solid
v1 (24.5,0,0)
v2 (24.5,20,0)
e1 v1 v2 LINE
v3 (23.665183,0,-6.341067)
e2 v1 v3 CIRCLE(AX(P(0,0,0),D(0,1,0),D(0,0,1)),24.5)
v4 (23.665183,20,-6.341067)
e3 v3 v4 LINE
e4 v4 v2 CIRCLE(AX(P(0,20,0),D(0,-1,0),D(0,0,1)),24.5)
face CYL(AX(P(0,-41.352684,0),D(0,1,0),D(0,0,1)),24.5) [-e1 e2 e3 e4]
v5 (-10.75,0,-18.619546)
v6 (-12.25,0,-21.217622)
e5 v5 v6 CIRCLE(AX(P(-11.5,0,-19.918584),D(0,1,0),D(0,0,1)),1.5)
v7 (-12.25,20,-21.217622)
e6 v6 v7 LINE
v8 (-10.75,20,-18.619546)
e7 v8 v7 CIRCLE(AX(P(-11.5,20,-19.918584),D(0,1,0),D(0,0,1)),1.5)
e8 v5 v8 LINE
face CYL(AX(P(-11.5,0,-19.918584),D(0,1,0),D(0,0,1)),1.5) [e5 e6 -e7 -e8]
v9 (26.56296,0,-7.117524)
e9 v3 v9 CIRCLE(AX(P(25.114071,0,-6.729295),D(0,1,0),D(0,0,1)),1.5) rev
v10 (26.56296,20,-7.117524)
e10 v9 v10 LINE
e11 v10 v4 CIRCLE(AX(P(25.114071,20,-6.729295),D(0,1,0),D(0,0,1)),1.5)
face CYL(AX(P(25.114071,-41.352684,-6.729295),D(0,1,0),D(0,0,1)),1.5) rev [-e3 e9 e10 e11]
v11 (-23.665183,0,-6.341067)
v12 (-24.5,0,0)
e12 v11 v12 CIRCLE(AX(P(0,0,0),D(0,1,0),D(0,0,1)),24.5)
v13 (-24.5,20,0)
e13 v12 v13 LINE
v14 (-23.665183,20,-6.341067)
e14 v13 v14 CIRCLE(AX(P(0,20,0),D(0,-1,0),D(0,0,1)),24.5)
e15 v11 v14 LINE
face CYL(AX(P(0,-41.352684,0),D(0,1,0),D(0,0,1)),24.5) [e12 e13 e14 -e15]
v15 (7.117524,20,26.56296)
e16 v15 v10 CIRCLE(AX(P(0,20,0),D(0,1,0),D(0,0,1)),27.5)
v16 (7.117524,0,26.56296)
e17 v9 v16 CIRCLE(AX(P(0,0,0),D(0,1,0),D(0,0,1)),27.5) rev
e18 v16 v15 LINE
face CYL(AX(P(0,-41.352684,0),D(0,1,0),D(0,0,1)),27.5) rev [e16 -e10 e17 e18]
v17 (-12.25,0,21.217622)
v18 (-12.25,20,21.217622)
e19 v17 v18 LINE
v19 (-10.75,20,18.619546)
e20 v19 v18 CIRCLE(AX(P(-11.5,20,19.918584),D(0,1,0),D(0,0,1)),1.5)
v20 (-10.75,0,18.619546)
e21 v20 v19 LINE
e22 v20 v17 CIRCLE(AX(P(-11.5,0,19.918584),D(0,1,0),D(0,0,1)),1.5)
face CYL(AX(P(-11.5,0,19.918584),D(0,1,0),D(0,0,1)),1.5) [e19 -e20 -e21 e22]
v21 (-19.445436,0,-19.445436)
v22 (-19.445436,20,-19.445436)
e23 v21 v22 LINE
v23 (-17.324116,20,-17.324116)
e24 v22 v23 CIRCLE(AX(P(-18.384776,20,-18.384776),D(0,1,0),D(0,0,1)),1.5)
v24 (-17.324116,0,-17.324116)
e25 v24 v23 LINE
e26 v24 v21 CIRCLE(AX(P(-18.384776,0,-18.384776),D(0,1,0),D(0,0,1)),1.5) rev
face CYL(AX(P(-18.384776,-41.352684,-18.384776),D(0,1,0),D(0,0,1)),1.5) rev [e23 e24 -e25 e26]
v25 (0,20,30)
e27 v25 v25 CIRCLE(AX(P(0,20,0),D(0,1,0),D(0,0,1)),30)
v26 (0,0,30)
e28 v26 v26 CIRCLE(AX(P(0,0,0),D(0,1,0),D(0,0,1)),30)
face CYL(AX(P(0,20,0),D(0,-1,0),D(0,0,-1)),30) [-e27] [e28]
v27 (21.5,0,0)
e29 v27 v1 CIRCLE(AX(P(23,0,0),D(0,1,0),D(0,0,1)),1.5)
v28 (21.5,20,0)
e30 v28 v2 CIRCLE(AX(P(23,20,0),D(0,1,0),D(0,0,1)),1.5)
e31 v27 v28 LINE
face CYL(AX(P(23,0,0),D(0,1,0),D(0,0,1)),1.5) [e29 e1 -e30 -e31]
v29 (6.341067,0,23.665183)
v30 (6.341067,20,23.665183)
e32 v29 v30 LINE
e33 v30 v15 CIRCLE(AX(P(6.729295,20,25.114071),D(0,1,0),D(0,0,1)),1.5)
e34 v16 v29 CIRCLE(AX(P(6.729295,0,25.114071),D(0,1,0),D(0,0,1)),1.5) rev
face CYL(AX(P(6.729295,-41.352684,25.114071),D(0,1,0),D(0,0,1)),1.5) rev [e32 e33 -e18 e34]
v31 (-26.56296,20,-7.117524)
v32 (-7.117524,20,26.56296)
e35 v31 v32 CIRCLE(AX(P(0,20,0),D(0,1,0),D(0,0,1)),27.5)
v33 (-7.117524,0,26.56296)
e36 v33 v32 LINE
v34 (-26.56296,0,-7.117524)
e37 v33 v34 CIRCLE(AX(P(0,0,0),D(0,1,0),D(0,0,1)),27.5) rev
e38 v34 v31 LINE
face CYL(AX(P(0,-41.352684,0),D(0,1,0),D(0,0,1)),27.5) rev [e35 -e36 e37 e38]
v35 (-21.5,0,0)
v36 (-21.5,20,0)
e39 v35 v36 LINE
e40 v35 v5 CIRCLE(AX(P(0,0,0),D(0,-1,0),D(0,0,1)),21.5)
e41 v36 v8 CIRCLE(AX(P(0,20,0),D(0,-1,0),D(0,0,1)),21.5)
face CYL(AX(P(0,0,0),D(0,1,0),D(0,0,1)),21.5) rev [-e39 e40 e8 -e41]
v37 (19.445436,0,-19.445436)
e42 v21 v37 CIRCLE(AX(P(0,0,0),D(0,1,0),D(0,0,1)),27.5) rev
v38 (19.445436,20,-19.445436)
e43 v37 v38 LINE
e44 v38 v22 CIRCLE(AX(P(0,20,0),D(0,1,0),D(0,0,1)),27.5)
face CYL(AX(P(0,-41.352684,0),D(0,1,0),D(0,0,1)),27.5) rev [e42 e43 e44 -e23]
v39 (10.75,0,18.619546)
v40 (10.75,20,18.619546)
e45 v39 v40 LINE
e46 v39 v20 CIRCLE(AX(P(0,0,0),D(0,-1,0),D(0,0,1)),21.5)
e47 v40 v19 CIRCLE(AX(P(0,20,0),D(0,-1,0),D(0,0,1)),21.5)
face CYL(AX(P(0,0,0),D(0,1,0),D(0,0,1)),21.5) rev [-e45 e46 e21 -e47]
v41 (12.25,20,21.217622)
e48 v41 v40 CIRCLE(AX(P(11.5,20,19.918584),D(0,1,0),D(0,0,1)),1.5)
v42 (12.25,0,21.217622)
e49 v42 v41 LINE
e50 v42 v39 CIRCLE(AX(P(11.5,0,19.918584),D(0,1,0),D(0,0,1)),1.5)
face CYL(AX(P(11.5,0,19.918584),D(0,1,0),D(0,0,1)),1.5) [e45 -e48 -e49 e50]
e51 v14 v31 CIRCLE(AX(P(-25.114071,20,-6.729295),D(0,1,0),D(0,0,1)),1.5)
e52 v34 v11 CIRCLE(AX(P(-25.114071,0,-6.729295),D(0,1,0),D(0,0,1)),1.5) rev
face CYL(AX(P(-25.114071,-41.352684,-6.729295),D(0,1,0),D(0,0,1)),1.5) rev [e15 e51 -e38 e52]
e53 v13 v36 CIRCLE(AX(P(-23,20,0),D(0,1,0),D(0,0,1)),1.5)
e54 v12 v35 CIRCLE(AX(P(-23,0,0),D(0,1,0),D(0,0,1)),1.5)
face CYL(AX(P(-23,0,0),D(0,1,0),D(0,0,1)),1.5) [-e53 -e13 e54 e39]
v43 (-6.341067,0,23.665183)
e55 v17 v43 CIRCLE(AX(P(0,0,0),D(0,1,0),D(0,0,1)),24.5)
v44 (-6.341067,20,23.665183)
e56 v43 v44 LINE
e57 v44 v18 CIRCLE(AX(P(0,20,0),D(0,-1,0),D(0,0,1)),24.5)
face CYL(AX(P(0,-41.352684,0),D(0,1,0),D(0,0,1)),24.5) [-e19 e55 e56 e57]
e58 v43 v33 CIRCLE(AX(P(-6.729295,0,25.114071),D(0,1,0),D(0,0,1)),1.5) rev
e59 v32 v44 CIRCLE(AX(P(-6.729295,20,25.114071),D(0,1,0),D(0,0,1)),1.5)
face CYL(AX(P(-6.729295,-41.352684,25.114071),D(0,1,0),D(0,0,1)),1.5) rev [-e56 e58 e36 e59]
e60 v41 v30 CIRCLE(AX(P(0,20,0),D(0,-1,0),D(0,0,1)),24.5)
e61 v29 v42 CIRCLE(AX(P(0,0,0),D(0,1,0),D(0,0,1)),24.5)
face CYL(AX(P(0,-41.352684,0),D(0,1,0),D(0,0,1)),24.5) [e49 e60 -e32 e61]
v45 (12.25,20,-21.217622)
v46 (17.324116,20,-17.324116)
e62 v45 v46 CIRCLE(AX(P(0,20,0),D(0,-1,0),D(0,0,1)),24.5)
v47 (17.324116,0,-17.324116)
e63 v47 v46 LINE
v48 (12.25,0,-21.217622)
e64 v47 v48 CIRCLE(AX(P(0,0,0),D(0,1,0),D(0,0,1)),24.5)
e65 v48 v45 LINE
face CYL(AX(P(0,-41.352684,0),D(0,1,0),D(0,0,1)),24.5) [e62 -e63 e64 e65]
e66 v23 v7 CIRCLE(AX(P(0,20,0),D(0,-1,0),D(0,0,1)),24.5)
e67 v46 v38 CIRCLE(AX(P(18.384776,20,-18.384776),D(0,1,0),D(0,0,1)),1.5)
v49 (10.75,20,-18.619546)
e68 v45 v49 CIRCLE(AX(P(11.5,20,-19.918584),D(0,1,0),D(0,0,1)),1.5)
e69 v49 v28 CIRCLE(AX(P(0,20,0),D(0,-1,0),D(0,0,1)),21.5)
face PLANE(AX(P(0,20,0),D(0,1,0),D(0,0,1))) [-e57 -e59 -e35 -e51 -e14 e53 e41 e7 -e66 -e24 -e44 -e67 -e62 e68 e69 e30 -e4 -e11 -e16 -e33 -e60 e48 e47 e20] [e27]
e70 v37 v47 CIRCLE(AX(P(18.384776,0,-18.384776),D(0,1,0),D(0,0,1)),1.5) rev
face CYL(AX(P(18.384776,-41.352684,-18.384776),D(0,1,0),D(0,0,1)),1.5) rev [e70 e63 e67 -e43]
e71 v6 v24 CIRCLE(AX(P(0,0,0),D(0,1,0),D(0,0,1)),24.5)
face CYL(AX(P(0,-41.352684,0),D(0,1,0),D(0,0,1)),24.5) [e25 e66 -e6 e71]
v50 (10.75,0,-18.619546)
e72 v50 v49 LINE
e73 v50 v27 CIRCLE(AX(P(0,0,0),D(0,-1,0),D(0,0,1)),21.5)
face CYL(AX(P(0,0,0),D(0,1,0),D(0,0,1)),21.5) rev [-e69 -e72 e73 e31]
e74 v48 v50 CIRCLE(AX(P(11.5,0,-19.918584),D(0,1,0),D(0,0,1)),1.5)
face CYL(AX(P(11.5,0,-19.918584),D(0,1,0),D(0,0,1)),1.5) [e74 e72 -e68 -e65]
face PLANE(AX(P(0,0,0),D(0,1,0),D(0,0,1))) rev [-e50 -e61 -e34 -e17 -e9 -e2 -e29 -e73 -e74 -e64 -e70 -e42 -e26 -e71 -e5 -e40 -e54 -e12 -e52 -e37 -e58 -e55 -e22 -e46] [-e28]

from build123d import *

# Parameters (mm, degrees)
ESQUISSE1_R          = 30
ESQUISSE1_R_2        = 19
BOSS_EXTRU_1_DEPTH   = 20
EMPREINTE1_OUTLINE_R = 19
EMPREINTE1_DEPTH     = 20


# Read off the part's stored shape, not the designer's step: Empreinte1
with BuildPart() as part:
    # Esquisse1 → Boss.-Extru.1 (new body)
    with BuildSketch(Plane(origin=(0, 0, 0), x_dir=(1, 0, 0), z_dir=(0, 1, 0))):
        with Locations(Location((0, 0, 0), (0, 0, 270))):
            Circle(ESQUISSE1_R)
        with Locations(Location((0, 0, 0), (0, 0, 270))):
            Circle(ESQUISSE1_R_2, mode=Mode.SUBTRACT)
    extrude(amount=BOSS_EXTRU_1_DEPTH)

    # Empreinte1 outline → Empreinte1 (cut)
    with BuildSketch(Plane(origin=(0, 0, 0), x_dir=(1, 0, 0), z_dir=(0, 1, 0))):
        with BuildLine():
            ThreePointArc((-12.25, 21.217622393), (-10.200961894, 20.668584287), (-10.75, 18.619546181))
            ThreePointArc((-10.75, 18.619546181), (-18.619546181, 10.75), (-21.5, 0))
            ThreePointArc((-21.5, 0), (-23, -1.5), (-24.5, 0))
            ThreePointArc((-24.5, 0), (-24.290399104, 3.197891709), (-23.665182744, 6.341066605))
            ThreePointArc((-23.665182744, 6.341066605), (-24.725842916, 8.178183912), (-26.562960223, 7.11752374))
            ThreePointArc((-26.562960223, 7.11752374), (-23.815698604, -13.75), (-7.11752374, -26.562960223))
            ThreePointArc((-7.11752374, -26.562960223), (-5.280406433, -25.502300051), (-6.341066605, -23.665182744))
            ThreePointArc((-6.341066605, -23.665182744), (-9.375744093, -22.635048547), (-12.25, -21.217622393))
            ThreePointArc((-12.25, -21.217622393), (-12.799038106, -19.168584287), (-10.75, -18.619546181))
            ThreePointArc((-10.75, -18.619546181), (0, -21.5), (10.75, -18.619546181))
            ThreePointArc((10.75, -18.619546181), (12.799038106, -19.168584287), (12.25, -21.217622393))
            ThreePointArc((12.25, -21.217622393), (9.375744093, -22.635048547), (6.341066605, -23.665182744))
            ThreePointArc((6.341066605, -23.665182744), (5.280406433, -25.502300051), (7.11752374, -26.562960223))
            ThreePointArc((7.11752374, -26.562960223), (23.815698604, -13.75), (26.562960223, 7.11752374))
            ThreePointArc((26.562960223, 7.11752374), (24.725842916, 8.178183912), (23.665182744, 6.341066605))
            ThreePointArc((23.665182744, 6.341066605), (24.290399104, 3.197891709), (24.5, 0))
            ThreePointArc((24.5, 0), (23, -1.5), (21.5, 0))
            ThreePointArc((21.5, 0), (18.619546181, 10.75), (10.75, 18.619546181))
            ThreePointArc((10.75, 18.619546181), (10.200961894, 20.668584287), (12.25, 21.217622393))
            ThreePointArc((12.25, 21.217622393), (14.914655011, 19.437156837), (17.324116139, 17.324116139))
            ThreePointArc((17.324116139, 17.324116139), (19.445436483, 17.324116139), (19.445436483, 19.445436483))
            ThreePointArc((19.445436483, 19.445436483), (0, 27.5), (-19.445436483, 19.445436483))
            ThreePointArc((-19.445436483, 19.445436483), (-19.445436483, 17.324116139), (-17.324116139, 17.324116139))
            ThreePointArc((-17.324116139, 17.324116139), (-14.914655011, 19.437156837), (-12.25, 21.217622393))
        make_face()
        Circle(EMPREINTE1_OUTLINE_R, mode=Mode.SUBTRACT)
    extrude(amount=EMPREINTE1_DEPTH, mode=Mode.SUBTRACT)


solid = part.part
